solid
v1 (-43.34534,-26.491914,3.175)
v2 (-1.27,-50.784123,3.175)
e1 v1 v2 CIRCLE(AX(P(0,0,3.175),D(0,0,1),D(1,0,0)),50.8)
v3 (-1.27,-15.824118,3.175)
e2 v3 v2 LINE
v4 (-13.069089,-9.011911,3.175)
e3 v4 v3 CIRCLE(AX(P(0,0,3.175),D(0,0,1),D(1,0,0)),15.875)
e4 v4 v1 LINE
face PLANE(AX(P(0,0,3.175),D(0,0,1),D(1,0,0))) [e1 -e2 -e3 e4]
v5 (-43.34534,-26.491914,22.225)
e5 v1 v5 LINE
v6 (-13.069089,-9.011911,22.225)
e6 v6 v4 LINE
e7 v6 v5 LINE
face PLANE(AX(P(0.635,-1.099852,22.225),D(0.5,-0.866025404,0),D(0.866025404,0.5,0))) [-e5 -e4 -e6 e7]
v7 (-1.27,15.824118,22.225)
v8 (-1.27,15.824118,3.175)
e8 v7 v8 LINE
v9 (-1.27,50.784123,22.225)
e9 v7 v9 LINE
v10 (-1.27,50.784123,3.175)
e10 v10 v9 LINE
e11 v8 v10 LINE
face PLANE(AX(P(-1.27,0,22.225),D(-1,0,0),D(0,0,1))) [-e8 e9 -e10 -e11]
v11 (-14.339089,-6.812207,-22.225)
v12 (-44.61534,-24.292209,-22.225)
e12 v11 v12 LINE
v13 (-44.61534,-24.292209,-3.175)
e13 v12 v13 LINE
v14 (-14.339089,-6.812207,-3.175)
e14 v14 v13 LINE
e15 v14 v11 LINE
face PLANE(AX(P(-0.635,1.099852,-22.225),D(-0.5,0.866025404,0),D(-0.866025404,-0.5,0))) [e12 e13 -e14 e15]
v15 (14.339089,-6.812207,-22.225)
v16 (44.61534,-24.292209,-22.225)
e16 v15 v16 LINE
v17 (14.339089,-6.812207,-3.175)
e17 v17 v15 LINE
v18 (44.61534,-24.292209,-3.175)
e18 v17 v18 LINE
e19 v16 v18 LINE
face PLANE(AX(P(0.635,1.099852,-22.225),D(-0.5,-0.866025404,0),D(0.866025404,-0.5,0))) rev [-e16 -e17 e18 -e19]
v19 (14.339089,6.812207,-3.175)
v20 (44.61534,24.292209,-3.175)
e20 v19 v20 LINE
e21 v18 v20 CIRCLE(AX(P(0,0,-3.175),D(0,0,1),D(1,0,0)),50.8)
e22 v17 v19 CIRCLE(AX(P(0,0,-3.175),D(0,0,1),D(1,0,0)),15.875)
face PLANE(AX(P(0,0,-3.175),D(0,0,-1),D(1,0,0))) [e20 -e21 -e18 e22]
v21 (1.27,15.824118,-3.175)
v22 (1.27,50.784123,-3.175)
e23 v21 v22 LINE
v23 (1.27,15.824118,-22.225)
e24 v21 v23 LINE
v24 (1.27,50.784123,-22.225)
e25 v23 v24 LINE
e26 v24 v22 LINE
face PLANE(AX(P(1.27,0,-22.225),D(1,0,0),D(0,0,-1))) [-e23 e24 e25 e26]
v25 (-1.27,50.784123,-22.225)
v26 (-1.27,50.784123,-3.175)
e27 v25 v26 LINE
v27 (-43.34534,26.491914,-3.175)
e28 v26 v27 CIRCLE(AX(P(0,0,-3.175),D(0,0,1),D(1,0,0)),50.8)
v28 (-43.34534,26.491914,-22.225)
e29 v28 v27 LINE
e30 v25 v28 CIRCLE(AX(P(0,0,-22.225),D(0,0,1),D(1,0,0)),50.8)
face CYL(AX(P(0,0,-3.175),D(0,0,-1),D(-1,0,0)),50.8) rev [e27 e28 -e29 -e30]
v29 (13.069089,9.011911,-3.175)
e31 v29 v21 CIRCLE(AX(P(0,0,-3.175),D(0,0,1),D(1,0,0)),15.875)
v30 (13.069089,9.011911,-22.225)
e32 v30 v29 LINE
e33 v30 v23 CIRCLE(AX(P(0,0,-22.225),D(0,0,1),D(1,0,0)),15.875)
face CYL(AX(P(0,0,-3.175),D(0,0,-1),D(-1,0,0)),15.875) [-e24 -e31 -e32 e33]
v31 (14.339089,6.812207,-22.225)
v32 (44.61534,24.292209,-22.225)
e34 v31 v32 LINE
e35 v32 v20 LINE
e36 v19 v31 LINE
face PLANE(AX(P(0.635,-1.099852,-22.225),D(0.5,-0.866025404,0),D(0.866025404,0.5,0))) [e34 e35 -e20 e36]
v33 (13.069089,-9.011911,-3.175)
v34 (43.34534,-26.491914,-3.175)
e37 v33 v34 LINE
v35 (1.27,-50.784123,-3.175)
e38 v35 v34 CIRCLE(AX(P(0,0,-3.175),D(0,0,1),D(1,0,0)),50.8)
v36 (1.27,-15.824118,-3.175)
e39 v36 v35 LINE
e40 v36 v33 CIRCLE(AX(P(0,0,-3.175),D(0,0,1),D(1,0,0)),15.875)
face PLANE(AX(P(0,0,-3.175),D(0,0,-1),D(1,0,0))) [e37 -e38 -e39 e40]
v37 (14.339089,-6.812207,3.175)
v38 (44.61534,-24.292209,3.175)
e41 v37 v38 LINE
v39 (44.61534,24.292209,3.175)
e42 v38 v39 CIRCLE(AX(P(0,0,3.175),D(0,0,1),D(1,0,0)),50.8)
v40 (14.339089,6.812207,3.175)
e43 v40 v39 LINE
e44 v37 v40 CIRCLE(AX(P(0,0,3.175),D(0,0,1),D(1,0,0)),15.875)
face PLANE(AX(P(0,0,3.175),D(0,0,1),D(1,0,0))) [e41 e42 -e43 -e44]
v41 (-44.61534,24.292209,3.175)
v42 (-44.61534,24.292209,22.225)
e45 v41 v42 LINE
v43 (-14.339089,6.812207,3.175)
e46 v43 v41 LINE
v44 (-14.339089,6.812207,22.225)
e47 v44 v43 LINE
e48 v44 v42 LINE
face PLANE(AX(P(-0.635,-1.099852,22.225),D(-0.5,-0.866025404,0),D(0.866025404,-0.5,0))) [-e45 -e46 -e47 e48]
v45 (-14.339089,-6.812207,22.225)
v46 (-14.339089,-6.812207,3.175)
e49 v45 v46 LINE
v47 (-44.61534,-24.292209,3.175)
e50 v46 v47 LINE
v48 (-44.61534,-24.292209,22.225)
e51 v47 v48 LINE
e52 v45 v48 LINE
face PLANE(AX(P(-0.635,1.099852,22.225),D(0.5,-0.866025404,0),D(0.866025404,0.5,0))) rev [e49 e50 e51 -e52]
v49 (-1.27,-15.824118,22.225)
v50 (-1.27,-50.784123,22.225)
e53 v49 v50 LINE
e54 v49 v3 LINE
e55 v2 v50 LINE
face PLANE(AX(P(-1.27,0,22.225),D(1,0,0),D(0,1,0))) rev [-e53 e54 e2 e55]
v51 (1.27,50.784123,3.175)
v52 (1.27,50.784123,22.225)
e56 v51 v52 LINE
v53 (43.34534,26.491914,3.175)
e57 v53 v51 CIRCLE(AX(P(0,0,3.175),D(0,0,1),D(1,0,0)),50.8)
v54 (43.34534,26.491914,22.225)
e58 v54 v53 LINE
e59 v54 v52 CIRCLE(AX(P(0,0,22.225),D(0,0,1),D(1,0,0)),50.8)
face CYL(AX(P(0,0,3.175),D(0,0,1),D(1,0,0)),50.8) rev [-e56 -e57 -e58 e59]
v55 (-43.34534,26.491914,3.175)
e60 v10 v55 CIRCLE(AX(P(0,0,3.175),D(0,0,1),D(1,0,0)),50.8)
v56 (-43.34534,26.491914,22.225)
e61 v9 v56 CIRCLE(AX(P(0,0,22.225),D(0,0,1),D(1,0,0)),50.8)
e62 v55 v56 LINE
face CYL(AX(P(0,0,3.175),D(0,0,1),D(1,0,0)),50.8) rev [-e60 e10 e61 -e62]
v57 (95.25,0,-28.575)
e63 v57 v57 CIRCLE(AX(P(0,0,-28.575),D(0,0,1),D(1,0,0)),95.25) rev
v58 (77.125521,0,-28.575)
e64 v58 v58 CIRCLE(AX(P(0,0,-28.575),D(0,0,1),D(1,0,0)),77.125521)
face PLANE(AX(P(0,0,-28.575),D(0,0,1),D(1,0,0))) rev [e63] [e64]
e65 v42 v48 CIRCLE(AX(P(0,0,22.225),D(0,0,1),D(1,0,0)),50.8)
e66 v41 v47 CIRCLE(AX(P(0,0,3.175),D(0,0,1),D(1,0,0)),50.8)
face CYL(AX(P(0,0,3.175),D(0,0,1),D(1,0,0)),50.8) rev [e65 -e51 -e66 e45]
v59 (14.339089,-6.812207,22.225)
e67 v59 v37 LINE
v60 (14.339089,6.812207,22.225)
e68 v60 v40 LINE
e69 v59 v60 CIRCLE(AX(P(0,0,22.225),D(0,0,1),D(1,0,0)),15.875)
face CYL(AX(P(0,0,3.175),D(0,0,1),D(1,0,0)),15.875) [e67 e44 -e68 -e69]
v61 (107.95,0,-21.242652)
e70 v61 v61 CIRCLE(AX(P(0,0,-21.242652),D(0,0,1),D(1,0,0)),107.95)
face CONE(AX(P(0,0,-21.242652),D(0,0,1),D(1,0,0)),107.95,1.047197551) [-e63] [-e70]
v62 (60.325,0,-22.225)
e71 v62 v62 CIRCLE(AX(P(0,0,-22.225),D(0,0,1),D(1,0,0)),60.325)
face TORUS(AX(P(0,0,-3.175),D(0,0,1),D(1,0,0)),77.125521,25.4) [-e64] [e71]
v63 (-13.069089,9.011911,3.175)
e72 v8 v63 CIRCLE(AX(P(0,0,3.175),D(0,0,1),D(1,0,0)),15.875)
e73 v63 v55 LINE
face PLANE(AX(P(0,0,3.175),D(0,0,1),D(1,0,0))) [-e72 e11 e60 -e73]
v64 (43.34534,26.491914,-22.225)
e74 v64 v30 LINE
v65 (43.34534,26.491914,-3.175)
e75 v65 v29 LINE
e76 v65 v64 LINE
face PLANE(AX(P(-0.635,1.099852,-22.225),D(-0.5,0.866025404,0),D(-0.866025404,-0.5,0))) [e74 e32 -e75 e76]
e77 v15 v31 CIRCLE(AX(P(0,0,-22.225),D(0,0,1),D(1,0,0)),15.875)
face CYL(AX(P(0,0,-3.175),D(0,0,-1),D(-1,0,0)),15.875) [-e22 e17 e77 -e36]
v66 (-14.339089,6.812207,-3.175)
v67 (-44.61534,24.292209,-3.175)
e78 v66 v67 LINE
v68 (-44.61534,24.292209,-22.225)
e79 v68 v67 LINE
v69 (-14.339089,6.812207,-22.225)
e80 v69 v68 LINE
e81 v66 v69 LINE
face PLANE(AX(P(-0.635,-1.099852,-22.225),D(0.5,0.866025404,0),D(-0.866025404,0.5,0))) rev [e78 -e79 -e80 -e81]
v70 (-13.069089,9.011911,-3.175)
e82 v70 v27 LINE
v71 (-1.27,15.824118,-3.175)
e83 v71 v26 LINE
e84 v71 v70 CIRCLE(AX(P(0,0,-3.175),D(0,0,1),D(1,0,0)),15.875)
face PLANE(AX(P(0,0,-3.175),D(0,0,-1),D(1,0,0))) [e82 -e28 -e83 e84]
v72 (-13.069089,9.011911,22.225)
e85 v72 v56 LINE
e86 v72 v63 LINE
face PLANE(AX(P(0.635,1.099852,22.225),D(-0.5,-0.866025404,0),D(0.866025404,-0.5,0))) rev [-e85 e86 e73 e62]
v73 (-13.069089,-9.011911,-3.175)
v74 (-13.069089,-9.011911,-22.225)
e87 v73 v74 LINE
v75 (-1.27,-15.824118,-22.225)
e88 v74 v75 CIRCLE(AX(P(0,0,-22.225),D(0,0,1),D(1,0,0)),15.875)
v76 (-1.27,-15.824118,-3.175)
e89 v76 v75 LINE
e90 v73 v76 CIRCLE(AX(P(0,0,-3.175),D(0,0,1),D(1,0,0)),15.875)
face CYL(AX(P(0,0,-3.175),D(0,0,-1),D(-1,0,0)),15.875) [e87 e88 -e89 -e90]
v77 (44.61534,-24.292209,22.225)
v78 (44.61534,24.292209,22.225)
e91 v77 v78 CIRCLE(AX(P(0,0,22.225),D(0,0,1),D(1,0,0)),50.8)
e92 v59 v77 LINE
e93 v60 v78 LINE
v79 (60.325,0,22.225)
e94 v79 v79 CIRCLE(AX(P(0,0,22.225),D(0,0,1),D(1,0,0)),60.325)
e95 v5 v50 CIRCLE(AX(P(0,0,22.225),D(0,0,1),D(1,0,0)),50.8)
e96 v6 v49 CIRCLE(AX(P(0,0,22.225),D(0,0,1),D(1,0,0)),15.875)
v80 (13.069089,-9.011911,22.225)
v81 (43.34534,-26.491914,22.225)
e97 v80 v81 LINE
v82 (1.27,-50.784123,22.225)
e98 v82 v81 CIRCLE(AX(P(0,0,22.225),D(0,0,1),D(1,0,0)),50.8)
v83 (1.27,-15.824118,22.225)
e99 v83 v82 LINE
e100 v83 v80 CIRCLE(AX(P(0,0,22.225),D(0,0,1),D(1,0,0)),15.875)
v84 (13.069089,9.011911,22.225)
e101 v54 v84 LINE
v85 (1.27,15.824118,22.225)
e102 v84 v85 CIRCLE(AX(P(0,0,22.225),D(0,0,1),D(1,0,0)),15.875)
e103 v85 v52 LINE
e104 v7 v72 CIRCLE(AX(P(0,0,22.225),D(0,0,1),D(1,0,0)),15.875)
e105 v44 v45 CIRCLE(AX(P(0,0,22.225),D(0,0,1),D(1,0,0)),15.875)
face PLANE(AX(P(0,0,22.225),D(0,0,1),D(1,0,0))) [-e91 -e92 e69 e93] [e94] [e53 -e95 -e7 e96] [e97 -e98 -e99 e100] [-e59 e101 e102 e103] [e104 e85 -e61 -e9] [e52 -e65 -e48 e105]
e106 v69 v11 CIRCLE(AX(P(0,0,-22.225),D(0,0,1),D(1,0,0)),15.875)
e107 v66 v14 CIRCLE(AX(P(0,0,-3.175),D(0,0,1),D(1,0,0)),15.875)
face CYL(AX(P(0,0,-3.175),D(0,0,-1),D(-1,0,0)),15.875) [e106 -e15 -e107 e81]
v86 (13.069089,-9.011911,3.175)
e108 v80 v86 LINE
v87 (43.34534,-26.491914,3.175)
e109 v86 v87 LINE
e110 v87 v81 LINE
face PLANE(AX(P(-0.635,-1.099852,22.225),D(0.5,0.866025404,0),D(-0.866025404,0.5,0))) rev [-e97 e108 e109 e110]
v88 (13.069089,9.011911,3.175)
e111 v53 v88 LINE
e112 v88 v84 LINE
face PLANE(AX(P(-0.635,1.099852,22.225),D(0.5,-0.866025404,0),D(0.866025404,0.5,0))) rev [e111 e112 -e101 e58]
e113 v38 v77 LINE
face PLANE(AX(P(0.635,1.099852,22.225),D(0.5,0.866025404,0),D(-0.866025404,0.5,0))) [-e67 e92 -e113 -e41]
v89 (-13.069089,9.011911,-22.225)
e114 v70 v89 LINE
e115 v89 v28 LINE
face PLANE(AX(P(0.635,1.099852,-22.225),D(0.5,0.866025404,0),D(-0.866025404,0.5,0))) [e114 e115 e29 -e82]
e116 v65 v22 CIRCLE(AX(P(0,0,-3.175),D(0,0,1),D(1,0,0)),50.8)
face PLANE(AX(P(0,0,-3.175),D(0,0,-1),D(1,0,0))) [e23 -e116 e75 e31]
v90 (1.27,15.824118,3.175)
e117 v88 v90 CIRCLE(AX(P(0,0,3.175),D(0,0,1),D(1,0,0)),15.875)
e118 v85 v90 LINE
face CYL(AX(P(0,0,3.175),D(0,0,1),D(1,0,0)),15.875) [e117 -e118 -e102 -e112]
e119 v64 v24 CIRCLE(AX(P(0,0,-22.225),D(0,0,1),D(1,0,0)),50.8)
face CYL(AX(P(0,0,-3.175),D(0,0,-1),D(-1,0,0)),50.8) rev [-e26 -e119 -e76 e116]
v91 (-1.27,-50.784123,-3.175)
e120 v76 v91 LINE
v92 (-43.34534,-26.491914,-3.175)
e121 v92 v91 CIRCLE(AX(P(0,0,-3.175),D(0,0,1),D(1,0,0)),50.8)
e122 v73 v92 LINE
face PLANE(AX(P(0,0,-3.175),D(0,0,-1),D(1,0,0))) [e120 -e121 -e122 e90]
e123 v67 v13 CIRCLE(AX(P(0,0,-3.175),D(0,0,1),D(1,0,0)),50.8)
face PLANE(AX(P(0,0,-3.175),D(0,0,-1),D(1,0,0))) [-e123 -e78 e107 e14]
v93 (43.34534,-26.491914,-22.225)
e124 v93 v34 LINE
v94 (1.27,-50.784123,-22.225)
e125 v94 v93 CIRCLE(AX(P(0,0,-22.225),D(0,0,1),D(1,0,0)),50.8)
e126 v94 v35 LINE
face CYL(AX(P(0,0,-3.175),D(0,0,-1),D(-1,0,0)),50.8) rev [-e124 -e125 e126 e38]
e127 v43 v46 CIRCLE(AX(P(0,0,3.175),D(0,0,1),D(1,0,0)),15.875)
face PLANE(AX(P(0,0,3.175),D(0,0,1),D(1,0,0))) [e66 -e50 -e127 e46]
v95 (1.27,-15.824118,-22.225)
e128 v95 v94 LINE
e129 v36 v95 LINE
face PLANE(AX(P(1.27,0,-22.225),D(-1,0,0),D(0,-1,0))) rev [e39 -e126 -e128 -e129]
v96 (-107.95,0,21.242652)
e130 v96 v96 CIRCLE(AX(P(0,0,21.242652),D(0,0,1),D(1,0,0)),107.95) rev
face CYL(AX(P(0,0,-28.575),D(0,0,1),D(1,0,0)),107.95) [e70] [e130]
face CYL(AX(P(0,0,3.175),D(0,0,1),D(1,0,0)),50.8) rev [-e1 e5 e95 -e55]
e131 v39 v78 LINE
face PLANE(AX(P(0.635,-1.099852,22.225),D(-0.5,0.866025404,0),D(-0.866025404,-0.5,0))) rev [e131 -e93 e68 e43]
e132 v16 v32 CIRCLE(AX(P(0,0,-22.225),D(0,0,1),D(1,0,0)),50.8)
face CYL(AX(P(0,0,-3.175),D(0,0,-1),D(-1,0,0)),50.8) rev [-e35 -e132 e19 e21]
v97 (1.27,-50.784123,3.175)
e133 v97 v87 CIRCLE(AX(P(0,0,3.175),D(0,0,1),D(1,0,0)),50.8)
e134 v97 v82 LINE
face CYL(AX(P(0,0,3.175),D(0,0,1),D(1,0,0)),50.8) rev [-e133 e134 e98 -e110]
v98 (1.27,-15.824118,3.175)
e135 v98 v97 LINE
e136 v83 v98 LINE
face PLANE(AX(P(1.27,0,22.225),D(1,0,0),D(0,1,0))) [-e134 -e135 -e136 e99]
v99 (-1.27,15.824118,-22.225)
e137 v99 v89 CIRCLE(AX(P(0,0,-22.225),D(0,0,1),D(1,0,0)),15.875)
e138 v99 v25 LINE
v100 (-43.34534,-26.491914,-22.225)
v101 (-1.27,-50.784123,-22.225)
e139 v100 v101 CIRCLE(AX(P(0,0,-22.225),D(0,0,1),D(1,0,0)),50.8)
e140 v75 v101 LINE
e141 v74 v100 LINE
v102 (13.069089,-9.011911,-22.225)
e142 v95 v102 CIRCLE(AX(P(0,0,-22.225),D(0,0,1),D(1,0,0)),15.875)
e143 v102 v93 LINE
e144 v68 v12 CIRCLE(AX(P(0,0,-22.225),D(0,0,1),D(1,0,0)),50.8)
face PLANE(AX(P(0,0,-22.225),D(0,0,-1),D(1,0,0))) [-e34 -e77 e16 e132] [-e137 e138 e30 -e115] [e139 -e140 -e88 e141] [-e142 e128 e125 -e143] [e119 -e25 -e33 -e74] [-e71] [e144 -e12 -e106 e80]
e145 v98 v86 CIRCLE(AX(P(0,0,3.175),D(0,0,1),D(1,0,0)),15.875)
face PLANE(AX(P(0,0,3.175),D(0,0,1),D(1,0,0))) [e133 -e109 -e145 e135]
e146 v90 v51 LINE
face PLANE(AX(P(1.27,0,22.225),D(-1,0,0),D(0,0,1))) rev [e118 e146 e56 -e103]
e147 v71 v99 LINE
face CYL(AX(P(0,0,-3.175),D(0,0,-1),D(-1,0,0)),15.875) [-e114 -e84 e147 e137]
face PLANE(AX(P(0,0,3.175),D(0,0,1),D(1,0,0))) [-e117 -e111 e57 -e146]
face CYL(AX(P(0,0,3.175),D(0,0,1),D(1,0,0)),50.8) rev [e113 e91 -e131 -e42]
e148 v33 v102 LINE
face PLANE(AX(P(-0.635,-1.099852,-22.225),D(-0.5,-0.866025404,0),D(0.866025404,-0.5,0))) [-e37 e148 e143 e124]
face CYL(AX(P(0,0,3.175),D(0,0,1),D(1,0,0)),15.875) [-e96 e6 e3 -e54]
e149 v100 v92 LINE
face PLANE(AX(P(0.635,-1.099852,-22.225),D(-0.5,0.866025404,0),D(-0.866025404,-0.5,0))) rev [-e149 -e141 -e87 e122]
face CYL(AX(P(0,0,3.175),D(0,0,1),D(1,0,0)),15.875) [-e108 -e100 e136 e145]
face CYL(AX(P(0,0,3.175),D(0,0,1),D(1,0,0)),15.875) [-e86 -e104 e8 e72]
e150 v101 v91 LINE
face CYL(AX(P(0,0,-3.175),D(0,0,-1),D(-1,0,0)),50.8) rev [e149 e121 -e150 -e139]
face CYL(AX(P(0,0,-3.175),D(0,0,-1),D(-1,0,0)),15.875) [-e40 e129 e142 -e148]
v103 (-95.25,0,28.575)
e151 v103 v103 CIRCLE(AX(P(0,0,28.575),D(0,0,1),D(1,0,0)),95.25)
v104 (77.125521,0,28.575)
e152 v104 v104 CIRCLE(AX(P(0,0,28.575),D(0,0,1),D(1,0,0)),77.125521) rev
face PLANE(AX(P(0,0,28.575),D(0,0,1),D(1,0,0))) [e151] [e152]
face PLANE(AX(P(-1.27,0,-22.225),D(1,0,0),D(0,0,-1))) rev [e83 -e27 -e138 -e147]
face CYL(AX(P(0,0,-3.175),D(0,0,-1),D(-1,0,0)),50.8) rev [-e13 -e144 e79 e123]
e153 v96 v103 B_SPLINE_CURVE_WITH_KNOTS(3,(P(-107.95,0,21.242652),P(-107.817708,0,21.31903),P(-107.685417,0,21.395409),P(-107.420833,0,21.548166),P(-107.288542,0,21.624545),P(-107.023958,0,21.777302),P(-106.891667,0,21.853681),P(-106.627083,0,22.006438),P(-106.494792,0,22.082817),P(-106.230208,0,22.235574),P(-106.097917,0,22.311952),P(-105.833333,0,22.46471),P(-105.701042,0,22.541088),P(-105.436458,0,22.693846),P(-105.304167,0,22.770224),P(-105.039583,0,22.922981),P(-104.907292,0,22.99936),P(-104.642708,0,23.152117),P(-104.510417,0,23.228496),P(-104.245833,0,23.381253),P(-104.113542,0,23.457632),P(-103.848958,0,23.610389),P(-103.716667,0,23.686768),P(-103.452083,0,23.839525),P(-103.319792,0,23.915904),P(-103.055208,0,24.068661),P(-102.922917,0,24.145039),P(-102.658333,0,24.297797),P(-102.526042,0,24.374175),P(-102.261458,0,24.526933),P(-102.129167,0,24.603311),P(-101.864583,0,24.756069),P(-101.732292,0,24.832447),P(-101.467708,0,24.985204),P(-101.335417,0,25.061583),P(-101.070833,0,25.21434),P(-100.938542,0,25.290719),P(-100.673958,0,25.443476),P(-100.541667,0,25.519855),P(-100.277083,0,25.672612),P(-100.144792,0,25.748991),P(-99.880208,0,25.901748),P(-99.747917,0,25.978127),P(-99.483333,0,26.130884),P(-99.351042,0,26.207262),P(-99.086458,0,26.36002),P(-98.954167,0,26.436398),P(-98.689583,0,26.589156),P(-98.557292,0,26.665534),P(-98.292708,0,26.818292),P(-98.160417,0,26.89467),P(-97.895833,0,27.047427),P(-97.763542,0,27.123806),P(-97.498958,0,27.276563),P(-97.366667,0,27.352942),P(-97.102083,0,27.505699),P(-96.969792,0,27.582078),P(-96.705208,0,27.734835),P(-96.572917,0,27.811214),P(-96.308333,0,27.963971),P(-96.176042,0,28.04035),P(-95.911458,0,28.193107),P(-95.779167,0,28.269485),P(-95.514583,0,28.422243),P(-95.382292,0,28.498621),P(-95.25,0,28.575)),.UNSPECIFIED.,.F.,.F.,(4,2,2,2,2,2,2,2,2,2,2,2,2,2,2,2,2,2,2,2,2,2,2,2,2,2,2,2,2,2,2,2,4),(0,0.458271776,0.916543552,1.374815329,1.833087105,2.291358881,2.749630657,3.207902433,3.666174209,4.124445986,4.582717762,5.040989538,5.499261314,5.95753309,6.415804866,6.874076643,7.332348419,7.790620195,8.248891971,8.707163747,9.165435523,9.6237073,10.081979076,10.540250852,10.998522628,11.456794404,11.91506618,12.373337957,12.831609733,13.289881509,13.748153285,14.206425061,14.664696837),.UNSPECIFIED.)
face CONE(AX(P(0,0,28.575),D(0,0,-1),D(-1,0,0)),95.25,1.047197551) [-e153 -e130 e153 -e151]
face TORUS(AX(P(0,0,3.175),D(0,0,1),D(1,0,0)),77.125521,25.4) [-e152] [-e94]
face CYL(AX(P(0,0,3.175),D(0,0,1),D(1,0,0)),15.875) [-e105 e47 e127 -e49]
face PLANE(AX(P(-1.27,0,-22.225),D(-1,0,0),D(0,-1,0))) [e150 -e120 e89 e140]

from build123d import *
from OCP.BRepFilletAPI import BRepFilletAPI_MakeChamfer

# Parameters (mm, degrees)
EXTRUDE1_DEPTH          = 28.575
EXTRUDE1_DEPTH_BACK     = 28.575
SKETCH1_R               = 107.95
CHAMFER1_SIZE           = 12.7
CHAMFER1_SIZE2          = 7.332348419
SKETCH2_R               = 60.325
EXTRUDE2_DEPTH          = 6.35
FILLET1_R               = 25.4
SKETCH5_R               = 50.8
EXTRUDE4_DEPTH          = 19.05
SKETCH6_W               = 2.54
SKETCH6_H               = 50.8
EXTRUDE_THIN1_DEPTH     = 19.05
CIRPATTERN2_COUNT       = 6
SKETCH7_R               = 15.875
EXTRUDE5_DEPTH          = 19.05
MIRROR4_COPY_1_SKETCH_W = 2.54
MIRROR4_COPY_1_SKETCH_H = 50.8
MIRROR4_COPY_1_DEPTH    = 19.05
MIRROR4_COPY_2_SKETCH_W = 2.54
MIRROR4_COPY_2_SKETCH_H = 50.8
MIRROR4_COPY_2_DEPTH    = 19.05
MIRROR4_COPY_3_SKETCH_W = 2.54
MIRROR4_COPY_3_SKETCH_H = 50.8
MIRROR4_COPY_3_DEPTH    = 19.05
MIRROR4_COPY_4_SKETCH_W = 2.54
MIRROR4_COPY_4_SKETCH_H = 50.8
MIRROR4_COPY_4_DEPTH    = 19.05
MIRROR4_COPY_5_SKETCH_W = 2.54
MIRROR4_COPY_5_SKETCH_H = 50.8
MIRROR4_COPY_5_DEPTH    = 19.05
FILLET2_R               = 25.4


with BuildPart() as part:
    # Sketch1 → Extrude1 (new, two sides: drawn at the far end of the back side and taken through both)
    with BuildSketch(Plane.XY.offset(-EXTRUDE1_DEPTH_BACK)):
        Circle(SKETCH1_R)
    extrude(amount=EXTRUDE1_DEPTH + EXTRUDE1_DEPTH_BACK)

    # Chamfer1: one chamfer whose edges measure the first distance from different faces: ONE call of the kernel's chamfer builder (chamfer() names one face for all edges)
    chamfer1_edges_1 = [part.edges().sort_by_distance(p)[0] for p in [
        (-107.95, 0, -28.575),
    ]]
    chamfer1_side_1 = [part.faces().sort_by_distance(p)[0] for p in [
        (0, 0, -28.575),
    ]]
    chamfer1_edges_2 = [part.edges().sort_by_distance(p)[0] for p in [
        (-107.95, 0, 28.575),
    ]]
    chamfer1_side_2 = [part.faces().sort_by_distance(p)[0] for p in [
        (0, 0, 28.575),
    ]]
    chamfer1 = BRepFilletAPI_MakeChamfer(part.part.solid().wrapped)
    for e in chamfer1_edges_1:
        chamfer1.Add(CHAMFER1_SIZE, CHAMFER1_SIZE2, e.wrapped, chamfer1_side_1[0].wrapped)  # the first distance lies on this face
    for e in chamfer1_edges_2:
        chamfer1.Add(CHAMFER1_SIZE, CHAMFER1_SIZE2, e.wrapped, chamfer1_side_2[0].wrapped)  # the first distance lies on this face
    add(Compound.cast(chamfer1.Shape()), mode=Mode.REPLACE)

    # Sketch2 → Extrude2 (cut)
    with BuildSketch(Plane.XY.offset(28.575)):
        Circle(SKETCH2_R)
    extrude2 = extrude(amount=-EXTRUDE2_DEPTH, mode=Mode.SUBTRACT)

    # Fillet1
    # the kernel refuses this fillet: 25.4 mm, written as the material it takes off along each edge
    with BuildSketch(Plane(origin=(0, 0, 28.575), x_dir=(1, 0, 0), z_dir=(0, -1, 0))) as fillet1_piece_1:
        with BuildLine():
            CenterArc((77.125520825, -25.4), FILLET1_R, 90, 41.409622109)
            Line((60.325, -6.35), (59.988989583, -5.969))
            ThreePointArc((59.988989583, -5.969), (59.817, -3.175), (59.817, 0))
            Line((59.817, 0), (60.325, 0.508))
            Line((60.325, 0.508), (77.125520825, 0.508))
            Line((77.125520825, 0.508), (77.125520825, 0))
        make_face()
    revolve(axis=Axis((0, 0, 28.575), (0, 0, 1)), mode=Mode.SUBTRACT)

    # Sketch5 → Extrude4 (cut)
    with BuildSketch(Plane.XY.offset(22.225)):
        Circle(SKETCH5_R)
    extrude4 = extrude(amount=-EXTRUDE4_DEPTH, mode=Mode.SUBTRACT)

    # Sketch6 → Extrude-Thin1 (add)
    with BuildSketch(Plane.XY.offset(3.175)):
        with Locations((0, 25.4)):
            Rectangle(SKETCH6_W, SKETCH6_H)
    extrude_thin1 = extrude(amount=EXTRUDE_THIN1_DEPTH)

    # CirPattern2: Extrude-Thin1 ×6 about axis
    cirpattern2_axis = Axis((0, 0, 0), (0, 0, 1))
    for i in range(1, CIRPATTERN2_COUNT):
        add(extrude_thin1.rotate(cirpattern2_axis, i * 360 / CIRPATTERN2_COUNT))

    # Sketch7 → Extrude5 (add)
    with BuildSketch(Plane.XY.offset(22.225)):
        Circle(SKETCH7_R)
    extrude5 = extrude(amount=-EXTRUDE5_DEPTH)

    # Mirror4: Extrude2, Extrude4, Extrude-Thin1, Extrude5 across plane
    add(extrude2.mirror(Plane.XY), mode=Mode.SUBTRACT)
    add(extrude4.mirror(Plane.XY), mode=Mode.SUBTRACT)
    add(extrude_thin1.mirror(Plane.XY))
    add(extrude5.mirror(Plane.XY))

    # Mirror4 copy 1 sketch → Mirror4 copy 1 (add)
    with BuildSketch(Plane(origin=(0, 0, -3.175), x_dir=(0.5000000000000001, 0.8660254037844386, 0), z_dir=(0, 0, -1))):
        with Locations((0, -25.4)):
            Rectangle(MIRROR4_COPY_1_SKETCH_W, MIRROR4_COPY_1_SKETCH_H)
    extrude(amount=MIRROR4_COPY_1_DEPTH)

    # Mirror4 copy 2 sketch → Mirror4 copy 2 (add)
    with BuildSketch(Plane(origin=(0, 0, -3.175), x_dir=(-0.4999999999999998, 0.8660254037844387, 0), z_dir=(0, 0, -1))):
        with Locations((0, -25.4)):
            Rectangle(MIRROR4_COPY_2_SKETCH_W, MIRROR4_COPY_2_SKETCH_H)
    extrude(amount=MIRROR4_COPY_2_DEPTH)

    # Mirror4 copy 3 sketch → Mirror4 copy 3 (add)
    with BuildSketch(Plane(origin=(0, 0, -3.175), x_dir=(-1, 0, 0), z_dir=(0, 0, -1))):
        with Locations((0, -25.4)):
            Rectangle(MIRROR4_COPY_3_SKETCH_W, MIRROR4_COPY_3_SKETCH_H)
    extrude(amount=MIRROR4_COPY_3_DEPTH)

    # Mirror4 copy 4 sketch → Mirror4 copy 4 (add)
    with BuildSketch(Plane(origin=(0, 0, -3.175), x_dir=(-0.5000000000000004, -0.8660254037844384, 0), z_dir=(0, 0, -1))):
        with Locations((0, -25.4)):
            Rectangle(MIRROR4_COPY_4_SKETCH_W, MIRROR4_COPY_4_SKETCH_H)
    extrude(amount=MIRROR4_COPY_4_DEPTH)

    # Mirror4 copy 5 sketch → Mirror4 copy 5 (add)
    with BuildSketch(Plane(origin=(0, 0, -3.175), x_dir=(0.5000000000000001, -0.8660254037844386, 0), z_dir=(0, 0, -1))):
        with Locations((0, -25.4)):
            Rectangle(MIRROR4_COPY_5_SKETCH_W, MIRROR4_COPY_5_SKETCH_H)
    extrude(amount=MIRROR4_COPY_5_DEPTH)

    # Fillet2
    # the kernel refuses this fillet: 25.4 mm, written as the material it takes off along each edge
    with BuildSketch(Plane(origin=(0, 0, -28.575), x_dir=(1, 0, 0), z_dir=(0, -1, 0))) as fillet2_piece_1:
        with BuildLine():
            CenterArc((77.125520825, 25.4), FILLET2_R, 228.590377891, 41.409622109)
            Line((60.325, 6.35), (59.988989583, 5.969))
            ThreePointArc((59.988989583, 5.969), (59.817, 3.175), (59.817, 0))
            Line((59.817, 0), (60.325, -0.508))
            Line((60.325, -0.508), (77.125520825, -0.508))
            Line((77.125520825, -0.508), (77.125520825, 0))
        make_face()
    revolve(axis=Axis((0, 0, -28.575), (0, 0, 1)), mode=Mode.SUBTRACT)


solid = part.part
